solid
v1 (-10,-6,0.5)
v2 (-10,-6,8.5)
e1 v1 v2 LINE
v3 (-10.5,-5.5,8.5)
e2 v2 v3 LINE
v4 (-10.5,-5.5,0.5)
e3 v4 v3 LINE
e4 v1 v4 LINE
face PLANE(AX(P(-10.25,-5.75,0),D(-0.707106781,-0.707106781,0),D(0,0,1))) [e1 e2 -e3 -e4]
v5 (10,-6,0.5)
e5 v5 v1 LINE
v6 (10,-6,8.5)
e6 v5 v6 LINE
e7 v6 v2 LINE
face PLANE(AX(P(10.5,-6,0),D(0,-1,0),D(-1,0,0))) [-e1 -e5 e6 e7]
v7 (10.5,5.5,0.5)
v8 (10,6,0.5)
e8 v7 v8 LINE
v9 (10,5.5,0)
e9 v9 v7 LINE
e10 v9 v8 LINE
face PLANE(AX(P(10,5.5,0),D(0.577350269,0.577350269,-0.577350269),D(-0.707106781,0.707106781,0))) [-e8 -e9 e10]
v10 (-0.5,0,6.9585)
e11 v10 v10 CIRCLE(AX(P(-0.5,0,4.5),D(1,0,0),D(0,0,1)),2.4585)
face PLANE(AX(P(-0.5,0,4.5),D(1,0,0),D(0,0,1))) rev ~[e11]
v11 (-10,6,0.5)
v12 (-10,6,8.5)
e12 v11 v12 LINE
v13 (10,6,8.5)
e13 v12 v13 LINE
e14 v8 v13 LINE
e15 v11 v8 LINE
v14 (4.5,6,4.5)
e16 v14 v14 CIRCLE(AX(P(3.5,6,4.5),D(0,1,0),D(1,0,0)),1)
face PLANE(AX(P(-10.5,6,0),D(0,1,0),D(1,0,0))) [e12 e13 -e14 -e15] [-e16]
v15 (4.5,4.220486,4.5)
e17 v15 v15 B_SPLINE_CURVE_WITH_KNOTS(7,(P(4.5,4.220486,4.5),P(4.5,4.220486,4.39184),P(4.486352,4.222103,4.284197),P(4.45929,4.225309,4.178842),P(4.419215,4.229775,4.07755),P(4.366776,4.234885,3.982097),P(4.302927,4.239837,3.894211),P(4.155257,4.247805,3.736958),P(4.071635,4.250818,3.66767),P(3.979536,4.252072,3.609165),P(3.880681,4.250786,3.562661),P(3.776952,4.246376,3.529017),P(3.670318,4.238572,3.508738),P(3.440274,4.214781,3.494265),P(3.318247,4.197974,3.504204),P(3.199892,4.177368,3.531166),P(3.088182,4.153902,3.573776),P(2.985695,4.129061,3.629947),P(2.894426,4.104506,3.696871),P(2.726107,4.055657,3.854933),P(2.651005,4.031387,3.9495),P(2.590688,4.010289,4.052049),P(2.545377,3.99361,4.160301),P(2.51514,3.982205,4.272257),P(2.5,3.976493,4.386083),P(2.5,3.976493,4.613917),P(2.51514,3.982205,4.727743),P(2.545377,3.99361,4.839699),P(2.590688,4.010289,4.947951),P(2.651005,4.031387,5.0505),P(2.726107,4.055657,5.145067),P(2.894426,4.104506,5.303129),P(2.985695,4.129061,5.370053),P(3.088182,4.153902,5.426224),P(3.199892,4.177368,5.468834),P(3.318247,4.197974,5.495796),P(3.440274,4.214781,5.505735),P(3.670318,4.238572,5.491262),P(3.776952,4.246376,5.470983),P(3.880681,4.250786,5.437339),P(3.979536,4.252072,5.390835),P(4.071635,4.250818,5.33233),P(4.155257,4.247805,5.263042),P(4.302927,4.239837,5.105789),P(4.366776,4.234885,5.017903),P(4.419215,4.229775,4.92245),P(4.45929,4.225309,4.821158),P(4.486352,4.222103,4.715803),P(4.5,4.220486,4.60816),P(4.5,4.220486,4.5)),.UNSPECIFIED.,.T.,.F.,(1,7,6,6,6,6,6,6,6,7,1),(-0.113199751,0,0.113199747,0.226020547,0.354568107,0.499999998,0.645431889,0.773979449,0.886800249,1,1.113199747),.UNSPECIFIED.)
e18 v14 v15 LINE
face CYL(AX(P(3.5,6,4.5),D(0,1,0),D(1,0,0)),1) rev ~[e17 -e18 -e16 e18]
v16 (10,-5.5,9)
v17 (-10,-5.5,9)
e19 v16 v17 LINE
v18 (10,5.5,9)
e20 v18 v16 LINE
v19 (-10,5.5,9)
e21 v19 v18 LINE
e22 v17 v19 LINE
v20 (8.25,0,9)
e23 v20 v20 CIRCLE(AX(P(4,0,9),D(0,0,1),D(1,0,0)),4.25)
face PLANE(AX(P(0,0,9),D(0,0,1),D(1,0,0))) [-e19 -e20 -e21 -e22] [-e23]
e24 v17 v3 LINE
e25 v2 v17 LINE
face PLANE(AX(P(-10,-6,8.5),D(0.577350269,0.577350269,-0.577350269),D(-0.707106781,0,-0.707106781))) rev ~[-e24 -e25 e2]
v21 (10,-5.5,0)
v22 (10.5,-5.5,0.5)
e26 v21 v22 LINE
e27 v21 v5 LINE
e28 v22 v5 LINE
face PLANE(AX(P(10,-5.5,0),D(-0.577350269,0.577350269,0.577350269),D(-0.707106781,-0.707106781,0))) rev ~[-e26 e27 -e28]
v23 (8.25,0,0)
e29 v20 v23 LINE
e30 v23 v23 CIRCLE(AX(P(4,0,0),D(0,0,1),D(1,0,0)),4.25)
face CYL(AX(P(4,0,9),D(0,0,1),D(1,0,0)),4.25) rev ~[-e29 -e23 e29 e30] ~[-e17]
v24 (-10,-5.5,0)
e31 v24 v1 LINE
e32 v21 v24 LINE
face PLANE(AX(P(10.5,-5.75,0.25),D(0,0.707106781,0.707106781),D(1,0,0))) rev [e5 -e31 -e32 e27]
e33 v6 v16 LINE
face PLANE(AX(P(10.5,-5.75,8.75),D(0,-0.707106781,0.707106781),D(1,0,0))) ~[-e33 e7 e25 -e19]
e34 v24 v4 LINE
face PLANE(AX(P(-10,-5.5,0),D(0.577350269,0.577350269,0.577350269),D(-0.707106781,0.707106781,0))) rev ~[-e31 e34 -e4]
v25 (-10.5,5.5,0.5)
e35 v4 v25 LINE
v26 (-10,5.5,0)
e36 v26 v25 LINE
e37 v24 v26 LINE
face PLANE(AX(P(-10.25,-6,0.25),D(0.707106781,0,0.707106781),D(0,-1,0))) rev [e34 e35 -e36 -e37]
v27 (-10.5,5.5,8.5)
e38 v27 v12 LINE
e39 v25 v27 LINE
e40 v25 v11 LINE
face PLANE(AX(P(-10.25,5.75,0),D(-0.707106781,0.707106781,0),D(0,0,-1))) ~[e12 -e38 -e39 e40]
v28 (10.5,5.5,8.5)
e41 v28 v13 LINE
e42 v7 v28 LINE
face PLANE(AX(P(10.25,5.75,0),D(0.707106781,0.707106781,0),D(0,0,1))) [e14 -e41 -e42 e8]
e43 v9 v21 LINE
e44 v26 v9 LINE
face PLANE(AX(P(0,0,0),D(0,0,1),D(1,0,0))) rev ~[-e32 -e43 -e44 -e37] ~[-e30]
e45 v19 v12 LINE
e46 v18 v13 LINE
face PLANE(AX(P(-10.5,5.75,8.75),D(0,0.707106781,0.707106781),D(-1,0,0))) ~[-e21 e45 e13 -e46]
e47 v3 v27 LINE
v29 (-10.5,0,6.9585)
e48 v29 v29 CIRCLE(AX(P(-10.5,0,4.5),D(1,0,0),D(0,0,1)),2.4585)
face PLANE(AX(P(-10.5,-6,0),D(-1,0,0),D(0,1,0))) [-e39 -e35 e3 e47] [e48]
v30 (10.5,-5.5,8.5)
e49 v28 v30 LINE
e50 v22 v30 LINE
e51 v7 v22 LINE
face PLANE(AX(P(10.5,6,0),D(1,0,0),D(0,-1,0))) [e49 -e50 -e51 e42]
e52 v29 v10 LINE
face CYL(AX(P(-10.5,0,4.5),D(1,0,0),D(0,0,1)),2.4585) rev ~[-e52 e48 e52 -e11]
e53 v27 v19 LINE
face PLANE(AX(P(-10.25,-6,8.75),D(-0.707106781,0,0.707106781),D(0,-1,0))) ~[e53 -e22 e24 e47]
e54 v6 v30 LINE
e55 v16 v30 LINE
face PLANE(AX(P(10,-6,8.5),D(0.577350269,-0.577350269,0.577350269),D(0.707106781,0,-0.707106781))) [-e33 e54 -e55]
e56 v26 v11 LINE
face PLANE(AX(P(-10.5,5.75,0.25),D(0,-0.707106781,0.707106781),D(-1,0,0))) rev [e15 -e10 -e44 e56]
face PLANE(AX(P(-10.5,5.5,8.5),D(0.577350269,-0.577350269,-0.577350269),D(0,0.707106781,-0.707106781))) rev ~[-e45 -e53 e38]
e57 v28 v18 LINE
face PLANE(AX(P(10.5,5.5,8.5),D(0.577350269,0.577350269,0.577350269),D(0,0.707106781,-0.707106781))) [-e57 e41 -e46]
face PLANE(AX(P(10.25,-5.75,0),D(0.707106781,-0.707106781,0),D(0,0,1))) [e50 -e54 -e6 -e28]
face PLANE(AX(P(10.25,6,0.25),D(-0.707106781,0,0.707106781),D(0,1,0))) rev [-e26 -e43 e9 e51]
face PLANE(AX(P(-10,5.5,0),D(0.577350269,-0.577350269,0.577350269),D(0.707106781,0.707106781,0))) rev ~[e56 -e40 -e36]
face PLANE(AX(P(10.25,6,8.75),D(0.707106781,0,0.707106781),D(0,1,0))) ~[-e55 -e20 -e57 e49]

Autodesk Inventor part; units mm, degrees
ref_plane "YZ Plane" through (0, 0, 0) normal (1, 0, 0) x (0, 1, 0)
ref_plane "XZ Plane" through (0, 0, 0) normal (0, 1, 0) x (-1, 0, 0)
ref_plane "XY Plane" through (0, 0, 0) normal (0, 0, 1) x (1, 0, 0)
sketch "Sketch1" plane through (0, 0, 0) normal (0, 0, 1) x (1, 0, 0)
  line L0 (-10.5, 6) -> (10.5, 6)
  line L1 (10.5, 6) -> (10.5, -6)
  line L2 (10.5, -6) -> (-10.5, -6)
  line L3 (-10.5, -6) -> (-10.5, 6)
  line L4 (-10.5, 6) -> (10.5, -6) construction
  line L5 (10.5, 6) -> (-10.5, -6) construction
  point P0 (0, 0)
  dimension "d0" = 21
  dimension "d1" = 12
extrude "Extrusion1" add sketch "Sketch1" along normal blind 9
chamfer "Chamfer1" distance 0.5 angle 45 12 edges at (0, 6, 9) (-10.5, 0, 9) (10.5, 0, 9) (0, -6, 9) (10.5, 6, 4.5) (10.5, -6, 4.5) (10.5, 0, 0) (-10.5, 6, 4.5) (-10.5, -6, 4.5) (0, -6, 0) (-10.5, 0, 0) (0, 6, 0)
sketch "Sketch2" plane through (0, 0, 9) normal (0, 0, 1) x (1, 0, 0)
  circle A0 centre (4, 0) radius 4.25
  line L0 (10.5, -5.5) -> (10.5, 5.5) projected
  point P0 (0, 0)
  dimension "d7" = 8.5
  dimension "d8" = 6.5
extrude "Extrusion2" cut sketch "Sketch2" against normal through all
sketch "Sketch3" plane through (-10, 6, 0.5) normal (0, 1, 0) x (1, 0, 0)
  line L0 (20, 0) -> (20, -8) projected
  circle A0 centre (13.5, -4) radius 1
  point P0 (10, 0.5)
  point P1 (20, -4)
  point P2 (20, -4)
  dimension "d11" = 2
  dimension "d12" = 6.5
extrude "Extrusion3" cut sketch "Sketch3" against normal up to surface
sketch "Sketch4" plane through (-10.5, -5.5, 0.5) normal (-1, 0, 0) x (0, 0, 1)
  point P0 (-0.5, 5.5)
  point P1 (4, 5.5)
hole "Hole1" at (-10.5, 0, 4.5) direction (1, 0, 0) diameter 4.917 depth 10 thread size "M6x1" class "6H" standard "ANSI Metric M Profile"
properties part number "16B2 - Con Head Big End" material "Steel AISI 1020 107 HR"
